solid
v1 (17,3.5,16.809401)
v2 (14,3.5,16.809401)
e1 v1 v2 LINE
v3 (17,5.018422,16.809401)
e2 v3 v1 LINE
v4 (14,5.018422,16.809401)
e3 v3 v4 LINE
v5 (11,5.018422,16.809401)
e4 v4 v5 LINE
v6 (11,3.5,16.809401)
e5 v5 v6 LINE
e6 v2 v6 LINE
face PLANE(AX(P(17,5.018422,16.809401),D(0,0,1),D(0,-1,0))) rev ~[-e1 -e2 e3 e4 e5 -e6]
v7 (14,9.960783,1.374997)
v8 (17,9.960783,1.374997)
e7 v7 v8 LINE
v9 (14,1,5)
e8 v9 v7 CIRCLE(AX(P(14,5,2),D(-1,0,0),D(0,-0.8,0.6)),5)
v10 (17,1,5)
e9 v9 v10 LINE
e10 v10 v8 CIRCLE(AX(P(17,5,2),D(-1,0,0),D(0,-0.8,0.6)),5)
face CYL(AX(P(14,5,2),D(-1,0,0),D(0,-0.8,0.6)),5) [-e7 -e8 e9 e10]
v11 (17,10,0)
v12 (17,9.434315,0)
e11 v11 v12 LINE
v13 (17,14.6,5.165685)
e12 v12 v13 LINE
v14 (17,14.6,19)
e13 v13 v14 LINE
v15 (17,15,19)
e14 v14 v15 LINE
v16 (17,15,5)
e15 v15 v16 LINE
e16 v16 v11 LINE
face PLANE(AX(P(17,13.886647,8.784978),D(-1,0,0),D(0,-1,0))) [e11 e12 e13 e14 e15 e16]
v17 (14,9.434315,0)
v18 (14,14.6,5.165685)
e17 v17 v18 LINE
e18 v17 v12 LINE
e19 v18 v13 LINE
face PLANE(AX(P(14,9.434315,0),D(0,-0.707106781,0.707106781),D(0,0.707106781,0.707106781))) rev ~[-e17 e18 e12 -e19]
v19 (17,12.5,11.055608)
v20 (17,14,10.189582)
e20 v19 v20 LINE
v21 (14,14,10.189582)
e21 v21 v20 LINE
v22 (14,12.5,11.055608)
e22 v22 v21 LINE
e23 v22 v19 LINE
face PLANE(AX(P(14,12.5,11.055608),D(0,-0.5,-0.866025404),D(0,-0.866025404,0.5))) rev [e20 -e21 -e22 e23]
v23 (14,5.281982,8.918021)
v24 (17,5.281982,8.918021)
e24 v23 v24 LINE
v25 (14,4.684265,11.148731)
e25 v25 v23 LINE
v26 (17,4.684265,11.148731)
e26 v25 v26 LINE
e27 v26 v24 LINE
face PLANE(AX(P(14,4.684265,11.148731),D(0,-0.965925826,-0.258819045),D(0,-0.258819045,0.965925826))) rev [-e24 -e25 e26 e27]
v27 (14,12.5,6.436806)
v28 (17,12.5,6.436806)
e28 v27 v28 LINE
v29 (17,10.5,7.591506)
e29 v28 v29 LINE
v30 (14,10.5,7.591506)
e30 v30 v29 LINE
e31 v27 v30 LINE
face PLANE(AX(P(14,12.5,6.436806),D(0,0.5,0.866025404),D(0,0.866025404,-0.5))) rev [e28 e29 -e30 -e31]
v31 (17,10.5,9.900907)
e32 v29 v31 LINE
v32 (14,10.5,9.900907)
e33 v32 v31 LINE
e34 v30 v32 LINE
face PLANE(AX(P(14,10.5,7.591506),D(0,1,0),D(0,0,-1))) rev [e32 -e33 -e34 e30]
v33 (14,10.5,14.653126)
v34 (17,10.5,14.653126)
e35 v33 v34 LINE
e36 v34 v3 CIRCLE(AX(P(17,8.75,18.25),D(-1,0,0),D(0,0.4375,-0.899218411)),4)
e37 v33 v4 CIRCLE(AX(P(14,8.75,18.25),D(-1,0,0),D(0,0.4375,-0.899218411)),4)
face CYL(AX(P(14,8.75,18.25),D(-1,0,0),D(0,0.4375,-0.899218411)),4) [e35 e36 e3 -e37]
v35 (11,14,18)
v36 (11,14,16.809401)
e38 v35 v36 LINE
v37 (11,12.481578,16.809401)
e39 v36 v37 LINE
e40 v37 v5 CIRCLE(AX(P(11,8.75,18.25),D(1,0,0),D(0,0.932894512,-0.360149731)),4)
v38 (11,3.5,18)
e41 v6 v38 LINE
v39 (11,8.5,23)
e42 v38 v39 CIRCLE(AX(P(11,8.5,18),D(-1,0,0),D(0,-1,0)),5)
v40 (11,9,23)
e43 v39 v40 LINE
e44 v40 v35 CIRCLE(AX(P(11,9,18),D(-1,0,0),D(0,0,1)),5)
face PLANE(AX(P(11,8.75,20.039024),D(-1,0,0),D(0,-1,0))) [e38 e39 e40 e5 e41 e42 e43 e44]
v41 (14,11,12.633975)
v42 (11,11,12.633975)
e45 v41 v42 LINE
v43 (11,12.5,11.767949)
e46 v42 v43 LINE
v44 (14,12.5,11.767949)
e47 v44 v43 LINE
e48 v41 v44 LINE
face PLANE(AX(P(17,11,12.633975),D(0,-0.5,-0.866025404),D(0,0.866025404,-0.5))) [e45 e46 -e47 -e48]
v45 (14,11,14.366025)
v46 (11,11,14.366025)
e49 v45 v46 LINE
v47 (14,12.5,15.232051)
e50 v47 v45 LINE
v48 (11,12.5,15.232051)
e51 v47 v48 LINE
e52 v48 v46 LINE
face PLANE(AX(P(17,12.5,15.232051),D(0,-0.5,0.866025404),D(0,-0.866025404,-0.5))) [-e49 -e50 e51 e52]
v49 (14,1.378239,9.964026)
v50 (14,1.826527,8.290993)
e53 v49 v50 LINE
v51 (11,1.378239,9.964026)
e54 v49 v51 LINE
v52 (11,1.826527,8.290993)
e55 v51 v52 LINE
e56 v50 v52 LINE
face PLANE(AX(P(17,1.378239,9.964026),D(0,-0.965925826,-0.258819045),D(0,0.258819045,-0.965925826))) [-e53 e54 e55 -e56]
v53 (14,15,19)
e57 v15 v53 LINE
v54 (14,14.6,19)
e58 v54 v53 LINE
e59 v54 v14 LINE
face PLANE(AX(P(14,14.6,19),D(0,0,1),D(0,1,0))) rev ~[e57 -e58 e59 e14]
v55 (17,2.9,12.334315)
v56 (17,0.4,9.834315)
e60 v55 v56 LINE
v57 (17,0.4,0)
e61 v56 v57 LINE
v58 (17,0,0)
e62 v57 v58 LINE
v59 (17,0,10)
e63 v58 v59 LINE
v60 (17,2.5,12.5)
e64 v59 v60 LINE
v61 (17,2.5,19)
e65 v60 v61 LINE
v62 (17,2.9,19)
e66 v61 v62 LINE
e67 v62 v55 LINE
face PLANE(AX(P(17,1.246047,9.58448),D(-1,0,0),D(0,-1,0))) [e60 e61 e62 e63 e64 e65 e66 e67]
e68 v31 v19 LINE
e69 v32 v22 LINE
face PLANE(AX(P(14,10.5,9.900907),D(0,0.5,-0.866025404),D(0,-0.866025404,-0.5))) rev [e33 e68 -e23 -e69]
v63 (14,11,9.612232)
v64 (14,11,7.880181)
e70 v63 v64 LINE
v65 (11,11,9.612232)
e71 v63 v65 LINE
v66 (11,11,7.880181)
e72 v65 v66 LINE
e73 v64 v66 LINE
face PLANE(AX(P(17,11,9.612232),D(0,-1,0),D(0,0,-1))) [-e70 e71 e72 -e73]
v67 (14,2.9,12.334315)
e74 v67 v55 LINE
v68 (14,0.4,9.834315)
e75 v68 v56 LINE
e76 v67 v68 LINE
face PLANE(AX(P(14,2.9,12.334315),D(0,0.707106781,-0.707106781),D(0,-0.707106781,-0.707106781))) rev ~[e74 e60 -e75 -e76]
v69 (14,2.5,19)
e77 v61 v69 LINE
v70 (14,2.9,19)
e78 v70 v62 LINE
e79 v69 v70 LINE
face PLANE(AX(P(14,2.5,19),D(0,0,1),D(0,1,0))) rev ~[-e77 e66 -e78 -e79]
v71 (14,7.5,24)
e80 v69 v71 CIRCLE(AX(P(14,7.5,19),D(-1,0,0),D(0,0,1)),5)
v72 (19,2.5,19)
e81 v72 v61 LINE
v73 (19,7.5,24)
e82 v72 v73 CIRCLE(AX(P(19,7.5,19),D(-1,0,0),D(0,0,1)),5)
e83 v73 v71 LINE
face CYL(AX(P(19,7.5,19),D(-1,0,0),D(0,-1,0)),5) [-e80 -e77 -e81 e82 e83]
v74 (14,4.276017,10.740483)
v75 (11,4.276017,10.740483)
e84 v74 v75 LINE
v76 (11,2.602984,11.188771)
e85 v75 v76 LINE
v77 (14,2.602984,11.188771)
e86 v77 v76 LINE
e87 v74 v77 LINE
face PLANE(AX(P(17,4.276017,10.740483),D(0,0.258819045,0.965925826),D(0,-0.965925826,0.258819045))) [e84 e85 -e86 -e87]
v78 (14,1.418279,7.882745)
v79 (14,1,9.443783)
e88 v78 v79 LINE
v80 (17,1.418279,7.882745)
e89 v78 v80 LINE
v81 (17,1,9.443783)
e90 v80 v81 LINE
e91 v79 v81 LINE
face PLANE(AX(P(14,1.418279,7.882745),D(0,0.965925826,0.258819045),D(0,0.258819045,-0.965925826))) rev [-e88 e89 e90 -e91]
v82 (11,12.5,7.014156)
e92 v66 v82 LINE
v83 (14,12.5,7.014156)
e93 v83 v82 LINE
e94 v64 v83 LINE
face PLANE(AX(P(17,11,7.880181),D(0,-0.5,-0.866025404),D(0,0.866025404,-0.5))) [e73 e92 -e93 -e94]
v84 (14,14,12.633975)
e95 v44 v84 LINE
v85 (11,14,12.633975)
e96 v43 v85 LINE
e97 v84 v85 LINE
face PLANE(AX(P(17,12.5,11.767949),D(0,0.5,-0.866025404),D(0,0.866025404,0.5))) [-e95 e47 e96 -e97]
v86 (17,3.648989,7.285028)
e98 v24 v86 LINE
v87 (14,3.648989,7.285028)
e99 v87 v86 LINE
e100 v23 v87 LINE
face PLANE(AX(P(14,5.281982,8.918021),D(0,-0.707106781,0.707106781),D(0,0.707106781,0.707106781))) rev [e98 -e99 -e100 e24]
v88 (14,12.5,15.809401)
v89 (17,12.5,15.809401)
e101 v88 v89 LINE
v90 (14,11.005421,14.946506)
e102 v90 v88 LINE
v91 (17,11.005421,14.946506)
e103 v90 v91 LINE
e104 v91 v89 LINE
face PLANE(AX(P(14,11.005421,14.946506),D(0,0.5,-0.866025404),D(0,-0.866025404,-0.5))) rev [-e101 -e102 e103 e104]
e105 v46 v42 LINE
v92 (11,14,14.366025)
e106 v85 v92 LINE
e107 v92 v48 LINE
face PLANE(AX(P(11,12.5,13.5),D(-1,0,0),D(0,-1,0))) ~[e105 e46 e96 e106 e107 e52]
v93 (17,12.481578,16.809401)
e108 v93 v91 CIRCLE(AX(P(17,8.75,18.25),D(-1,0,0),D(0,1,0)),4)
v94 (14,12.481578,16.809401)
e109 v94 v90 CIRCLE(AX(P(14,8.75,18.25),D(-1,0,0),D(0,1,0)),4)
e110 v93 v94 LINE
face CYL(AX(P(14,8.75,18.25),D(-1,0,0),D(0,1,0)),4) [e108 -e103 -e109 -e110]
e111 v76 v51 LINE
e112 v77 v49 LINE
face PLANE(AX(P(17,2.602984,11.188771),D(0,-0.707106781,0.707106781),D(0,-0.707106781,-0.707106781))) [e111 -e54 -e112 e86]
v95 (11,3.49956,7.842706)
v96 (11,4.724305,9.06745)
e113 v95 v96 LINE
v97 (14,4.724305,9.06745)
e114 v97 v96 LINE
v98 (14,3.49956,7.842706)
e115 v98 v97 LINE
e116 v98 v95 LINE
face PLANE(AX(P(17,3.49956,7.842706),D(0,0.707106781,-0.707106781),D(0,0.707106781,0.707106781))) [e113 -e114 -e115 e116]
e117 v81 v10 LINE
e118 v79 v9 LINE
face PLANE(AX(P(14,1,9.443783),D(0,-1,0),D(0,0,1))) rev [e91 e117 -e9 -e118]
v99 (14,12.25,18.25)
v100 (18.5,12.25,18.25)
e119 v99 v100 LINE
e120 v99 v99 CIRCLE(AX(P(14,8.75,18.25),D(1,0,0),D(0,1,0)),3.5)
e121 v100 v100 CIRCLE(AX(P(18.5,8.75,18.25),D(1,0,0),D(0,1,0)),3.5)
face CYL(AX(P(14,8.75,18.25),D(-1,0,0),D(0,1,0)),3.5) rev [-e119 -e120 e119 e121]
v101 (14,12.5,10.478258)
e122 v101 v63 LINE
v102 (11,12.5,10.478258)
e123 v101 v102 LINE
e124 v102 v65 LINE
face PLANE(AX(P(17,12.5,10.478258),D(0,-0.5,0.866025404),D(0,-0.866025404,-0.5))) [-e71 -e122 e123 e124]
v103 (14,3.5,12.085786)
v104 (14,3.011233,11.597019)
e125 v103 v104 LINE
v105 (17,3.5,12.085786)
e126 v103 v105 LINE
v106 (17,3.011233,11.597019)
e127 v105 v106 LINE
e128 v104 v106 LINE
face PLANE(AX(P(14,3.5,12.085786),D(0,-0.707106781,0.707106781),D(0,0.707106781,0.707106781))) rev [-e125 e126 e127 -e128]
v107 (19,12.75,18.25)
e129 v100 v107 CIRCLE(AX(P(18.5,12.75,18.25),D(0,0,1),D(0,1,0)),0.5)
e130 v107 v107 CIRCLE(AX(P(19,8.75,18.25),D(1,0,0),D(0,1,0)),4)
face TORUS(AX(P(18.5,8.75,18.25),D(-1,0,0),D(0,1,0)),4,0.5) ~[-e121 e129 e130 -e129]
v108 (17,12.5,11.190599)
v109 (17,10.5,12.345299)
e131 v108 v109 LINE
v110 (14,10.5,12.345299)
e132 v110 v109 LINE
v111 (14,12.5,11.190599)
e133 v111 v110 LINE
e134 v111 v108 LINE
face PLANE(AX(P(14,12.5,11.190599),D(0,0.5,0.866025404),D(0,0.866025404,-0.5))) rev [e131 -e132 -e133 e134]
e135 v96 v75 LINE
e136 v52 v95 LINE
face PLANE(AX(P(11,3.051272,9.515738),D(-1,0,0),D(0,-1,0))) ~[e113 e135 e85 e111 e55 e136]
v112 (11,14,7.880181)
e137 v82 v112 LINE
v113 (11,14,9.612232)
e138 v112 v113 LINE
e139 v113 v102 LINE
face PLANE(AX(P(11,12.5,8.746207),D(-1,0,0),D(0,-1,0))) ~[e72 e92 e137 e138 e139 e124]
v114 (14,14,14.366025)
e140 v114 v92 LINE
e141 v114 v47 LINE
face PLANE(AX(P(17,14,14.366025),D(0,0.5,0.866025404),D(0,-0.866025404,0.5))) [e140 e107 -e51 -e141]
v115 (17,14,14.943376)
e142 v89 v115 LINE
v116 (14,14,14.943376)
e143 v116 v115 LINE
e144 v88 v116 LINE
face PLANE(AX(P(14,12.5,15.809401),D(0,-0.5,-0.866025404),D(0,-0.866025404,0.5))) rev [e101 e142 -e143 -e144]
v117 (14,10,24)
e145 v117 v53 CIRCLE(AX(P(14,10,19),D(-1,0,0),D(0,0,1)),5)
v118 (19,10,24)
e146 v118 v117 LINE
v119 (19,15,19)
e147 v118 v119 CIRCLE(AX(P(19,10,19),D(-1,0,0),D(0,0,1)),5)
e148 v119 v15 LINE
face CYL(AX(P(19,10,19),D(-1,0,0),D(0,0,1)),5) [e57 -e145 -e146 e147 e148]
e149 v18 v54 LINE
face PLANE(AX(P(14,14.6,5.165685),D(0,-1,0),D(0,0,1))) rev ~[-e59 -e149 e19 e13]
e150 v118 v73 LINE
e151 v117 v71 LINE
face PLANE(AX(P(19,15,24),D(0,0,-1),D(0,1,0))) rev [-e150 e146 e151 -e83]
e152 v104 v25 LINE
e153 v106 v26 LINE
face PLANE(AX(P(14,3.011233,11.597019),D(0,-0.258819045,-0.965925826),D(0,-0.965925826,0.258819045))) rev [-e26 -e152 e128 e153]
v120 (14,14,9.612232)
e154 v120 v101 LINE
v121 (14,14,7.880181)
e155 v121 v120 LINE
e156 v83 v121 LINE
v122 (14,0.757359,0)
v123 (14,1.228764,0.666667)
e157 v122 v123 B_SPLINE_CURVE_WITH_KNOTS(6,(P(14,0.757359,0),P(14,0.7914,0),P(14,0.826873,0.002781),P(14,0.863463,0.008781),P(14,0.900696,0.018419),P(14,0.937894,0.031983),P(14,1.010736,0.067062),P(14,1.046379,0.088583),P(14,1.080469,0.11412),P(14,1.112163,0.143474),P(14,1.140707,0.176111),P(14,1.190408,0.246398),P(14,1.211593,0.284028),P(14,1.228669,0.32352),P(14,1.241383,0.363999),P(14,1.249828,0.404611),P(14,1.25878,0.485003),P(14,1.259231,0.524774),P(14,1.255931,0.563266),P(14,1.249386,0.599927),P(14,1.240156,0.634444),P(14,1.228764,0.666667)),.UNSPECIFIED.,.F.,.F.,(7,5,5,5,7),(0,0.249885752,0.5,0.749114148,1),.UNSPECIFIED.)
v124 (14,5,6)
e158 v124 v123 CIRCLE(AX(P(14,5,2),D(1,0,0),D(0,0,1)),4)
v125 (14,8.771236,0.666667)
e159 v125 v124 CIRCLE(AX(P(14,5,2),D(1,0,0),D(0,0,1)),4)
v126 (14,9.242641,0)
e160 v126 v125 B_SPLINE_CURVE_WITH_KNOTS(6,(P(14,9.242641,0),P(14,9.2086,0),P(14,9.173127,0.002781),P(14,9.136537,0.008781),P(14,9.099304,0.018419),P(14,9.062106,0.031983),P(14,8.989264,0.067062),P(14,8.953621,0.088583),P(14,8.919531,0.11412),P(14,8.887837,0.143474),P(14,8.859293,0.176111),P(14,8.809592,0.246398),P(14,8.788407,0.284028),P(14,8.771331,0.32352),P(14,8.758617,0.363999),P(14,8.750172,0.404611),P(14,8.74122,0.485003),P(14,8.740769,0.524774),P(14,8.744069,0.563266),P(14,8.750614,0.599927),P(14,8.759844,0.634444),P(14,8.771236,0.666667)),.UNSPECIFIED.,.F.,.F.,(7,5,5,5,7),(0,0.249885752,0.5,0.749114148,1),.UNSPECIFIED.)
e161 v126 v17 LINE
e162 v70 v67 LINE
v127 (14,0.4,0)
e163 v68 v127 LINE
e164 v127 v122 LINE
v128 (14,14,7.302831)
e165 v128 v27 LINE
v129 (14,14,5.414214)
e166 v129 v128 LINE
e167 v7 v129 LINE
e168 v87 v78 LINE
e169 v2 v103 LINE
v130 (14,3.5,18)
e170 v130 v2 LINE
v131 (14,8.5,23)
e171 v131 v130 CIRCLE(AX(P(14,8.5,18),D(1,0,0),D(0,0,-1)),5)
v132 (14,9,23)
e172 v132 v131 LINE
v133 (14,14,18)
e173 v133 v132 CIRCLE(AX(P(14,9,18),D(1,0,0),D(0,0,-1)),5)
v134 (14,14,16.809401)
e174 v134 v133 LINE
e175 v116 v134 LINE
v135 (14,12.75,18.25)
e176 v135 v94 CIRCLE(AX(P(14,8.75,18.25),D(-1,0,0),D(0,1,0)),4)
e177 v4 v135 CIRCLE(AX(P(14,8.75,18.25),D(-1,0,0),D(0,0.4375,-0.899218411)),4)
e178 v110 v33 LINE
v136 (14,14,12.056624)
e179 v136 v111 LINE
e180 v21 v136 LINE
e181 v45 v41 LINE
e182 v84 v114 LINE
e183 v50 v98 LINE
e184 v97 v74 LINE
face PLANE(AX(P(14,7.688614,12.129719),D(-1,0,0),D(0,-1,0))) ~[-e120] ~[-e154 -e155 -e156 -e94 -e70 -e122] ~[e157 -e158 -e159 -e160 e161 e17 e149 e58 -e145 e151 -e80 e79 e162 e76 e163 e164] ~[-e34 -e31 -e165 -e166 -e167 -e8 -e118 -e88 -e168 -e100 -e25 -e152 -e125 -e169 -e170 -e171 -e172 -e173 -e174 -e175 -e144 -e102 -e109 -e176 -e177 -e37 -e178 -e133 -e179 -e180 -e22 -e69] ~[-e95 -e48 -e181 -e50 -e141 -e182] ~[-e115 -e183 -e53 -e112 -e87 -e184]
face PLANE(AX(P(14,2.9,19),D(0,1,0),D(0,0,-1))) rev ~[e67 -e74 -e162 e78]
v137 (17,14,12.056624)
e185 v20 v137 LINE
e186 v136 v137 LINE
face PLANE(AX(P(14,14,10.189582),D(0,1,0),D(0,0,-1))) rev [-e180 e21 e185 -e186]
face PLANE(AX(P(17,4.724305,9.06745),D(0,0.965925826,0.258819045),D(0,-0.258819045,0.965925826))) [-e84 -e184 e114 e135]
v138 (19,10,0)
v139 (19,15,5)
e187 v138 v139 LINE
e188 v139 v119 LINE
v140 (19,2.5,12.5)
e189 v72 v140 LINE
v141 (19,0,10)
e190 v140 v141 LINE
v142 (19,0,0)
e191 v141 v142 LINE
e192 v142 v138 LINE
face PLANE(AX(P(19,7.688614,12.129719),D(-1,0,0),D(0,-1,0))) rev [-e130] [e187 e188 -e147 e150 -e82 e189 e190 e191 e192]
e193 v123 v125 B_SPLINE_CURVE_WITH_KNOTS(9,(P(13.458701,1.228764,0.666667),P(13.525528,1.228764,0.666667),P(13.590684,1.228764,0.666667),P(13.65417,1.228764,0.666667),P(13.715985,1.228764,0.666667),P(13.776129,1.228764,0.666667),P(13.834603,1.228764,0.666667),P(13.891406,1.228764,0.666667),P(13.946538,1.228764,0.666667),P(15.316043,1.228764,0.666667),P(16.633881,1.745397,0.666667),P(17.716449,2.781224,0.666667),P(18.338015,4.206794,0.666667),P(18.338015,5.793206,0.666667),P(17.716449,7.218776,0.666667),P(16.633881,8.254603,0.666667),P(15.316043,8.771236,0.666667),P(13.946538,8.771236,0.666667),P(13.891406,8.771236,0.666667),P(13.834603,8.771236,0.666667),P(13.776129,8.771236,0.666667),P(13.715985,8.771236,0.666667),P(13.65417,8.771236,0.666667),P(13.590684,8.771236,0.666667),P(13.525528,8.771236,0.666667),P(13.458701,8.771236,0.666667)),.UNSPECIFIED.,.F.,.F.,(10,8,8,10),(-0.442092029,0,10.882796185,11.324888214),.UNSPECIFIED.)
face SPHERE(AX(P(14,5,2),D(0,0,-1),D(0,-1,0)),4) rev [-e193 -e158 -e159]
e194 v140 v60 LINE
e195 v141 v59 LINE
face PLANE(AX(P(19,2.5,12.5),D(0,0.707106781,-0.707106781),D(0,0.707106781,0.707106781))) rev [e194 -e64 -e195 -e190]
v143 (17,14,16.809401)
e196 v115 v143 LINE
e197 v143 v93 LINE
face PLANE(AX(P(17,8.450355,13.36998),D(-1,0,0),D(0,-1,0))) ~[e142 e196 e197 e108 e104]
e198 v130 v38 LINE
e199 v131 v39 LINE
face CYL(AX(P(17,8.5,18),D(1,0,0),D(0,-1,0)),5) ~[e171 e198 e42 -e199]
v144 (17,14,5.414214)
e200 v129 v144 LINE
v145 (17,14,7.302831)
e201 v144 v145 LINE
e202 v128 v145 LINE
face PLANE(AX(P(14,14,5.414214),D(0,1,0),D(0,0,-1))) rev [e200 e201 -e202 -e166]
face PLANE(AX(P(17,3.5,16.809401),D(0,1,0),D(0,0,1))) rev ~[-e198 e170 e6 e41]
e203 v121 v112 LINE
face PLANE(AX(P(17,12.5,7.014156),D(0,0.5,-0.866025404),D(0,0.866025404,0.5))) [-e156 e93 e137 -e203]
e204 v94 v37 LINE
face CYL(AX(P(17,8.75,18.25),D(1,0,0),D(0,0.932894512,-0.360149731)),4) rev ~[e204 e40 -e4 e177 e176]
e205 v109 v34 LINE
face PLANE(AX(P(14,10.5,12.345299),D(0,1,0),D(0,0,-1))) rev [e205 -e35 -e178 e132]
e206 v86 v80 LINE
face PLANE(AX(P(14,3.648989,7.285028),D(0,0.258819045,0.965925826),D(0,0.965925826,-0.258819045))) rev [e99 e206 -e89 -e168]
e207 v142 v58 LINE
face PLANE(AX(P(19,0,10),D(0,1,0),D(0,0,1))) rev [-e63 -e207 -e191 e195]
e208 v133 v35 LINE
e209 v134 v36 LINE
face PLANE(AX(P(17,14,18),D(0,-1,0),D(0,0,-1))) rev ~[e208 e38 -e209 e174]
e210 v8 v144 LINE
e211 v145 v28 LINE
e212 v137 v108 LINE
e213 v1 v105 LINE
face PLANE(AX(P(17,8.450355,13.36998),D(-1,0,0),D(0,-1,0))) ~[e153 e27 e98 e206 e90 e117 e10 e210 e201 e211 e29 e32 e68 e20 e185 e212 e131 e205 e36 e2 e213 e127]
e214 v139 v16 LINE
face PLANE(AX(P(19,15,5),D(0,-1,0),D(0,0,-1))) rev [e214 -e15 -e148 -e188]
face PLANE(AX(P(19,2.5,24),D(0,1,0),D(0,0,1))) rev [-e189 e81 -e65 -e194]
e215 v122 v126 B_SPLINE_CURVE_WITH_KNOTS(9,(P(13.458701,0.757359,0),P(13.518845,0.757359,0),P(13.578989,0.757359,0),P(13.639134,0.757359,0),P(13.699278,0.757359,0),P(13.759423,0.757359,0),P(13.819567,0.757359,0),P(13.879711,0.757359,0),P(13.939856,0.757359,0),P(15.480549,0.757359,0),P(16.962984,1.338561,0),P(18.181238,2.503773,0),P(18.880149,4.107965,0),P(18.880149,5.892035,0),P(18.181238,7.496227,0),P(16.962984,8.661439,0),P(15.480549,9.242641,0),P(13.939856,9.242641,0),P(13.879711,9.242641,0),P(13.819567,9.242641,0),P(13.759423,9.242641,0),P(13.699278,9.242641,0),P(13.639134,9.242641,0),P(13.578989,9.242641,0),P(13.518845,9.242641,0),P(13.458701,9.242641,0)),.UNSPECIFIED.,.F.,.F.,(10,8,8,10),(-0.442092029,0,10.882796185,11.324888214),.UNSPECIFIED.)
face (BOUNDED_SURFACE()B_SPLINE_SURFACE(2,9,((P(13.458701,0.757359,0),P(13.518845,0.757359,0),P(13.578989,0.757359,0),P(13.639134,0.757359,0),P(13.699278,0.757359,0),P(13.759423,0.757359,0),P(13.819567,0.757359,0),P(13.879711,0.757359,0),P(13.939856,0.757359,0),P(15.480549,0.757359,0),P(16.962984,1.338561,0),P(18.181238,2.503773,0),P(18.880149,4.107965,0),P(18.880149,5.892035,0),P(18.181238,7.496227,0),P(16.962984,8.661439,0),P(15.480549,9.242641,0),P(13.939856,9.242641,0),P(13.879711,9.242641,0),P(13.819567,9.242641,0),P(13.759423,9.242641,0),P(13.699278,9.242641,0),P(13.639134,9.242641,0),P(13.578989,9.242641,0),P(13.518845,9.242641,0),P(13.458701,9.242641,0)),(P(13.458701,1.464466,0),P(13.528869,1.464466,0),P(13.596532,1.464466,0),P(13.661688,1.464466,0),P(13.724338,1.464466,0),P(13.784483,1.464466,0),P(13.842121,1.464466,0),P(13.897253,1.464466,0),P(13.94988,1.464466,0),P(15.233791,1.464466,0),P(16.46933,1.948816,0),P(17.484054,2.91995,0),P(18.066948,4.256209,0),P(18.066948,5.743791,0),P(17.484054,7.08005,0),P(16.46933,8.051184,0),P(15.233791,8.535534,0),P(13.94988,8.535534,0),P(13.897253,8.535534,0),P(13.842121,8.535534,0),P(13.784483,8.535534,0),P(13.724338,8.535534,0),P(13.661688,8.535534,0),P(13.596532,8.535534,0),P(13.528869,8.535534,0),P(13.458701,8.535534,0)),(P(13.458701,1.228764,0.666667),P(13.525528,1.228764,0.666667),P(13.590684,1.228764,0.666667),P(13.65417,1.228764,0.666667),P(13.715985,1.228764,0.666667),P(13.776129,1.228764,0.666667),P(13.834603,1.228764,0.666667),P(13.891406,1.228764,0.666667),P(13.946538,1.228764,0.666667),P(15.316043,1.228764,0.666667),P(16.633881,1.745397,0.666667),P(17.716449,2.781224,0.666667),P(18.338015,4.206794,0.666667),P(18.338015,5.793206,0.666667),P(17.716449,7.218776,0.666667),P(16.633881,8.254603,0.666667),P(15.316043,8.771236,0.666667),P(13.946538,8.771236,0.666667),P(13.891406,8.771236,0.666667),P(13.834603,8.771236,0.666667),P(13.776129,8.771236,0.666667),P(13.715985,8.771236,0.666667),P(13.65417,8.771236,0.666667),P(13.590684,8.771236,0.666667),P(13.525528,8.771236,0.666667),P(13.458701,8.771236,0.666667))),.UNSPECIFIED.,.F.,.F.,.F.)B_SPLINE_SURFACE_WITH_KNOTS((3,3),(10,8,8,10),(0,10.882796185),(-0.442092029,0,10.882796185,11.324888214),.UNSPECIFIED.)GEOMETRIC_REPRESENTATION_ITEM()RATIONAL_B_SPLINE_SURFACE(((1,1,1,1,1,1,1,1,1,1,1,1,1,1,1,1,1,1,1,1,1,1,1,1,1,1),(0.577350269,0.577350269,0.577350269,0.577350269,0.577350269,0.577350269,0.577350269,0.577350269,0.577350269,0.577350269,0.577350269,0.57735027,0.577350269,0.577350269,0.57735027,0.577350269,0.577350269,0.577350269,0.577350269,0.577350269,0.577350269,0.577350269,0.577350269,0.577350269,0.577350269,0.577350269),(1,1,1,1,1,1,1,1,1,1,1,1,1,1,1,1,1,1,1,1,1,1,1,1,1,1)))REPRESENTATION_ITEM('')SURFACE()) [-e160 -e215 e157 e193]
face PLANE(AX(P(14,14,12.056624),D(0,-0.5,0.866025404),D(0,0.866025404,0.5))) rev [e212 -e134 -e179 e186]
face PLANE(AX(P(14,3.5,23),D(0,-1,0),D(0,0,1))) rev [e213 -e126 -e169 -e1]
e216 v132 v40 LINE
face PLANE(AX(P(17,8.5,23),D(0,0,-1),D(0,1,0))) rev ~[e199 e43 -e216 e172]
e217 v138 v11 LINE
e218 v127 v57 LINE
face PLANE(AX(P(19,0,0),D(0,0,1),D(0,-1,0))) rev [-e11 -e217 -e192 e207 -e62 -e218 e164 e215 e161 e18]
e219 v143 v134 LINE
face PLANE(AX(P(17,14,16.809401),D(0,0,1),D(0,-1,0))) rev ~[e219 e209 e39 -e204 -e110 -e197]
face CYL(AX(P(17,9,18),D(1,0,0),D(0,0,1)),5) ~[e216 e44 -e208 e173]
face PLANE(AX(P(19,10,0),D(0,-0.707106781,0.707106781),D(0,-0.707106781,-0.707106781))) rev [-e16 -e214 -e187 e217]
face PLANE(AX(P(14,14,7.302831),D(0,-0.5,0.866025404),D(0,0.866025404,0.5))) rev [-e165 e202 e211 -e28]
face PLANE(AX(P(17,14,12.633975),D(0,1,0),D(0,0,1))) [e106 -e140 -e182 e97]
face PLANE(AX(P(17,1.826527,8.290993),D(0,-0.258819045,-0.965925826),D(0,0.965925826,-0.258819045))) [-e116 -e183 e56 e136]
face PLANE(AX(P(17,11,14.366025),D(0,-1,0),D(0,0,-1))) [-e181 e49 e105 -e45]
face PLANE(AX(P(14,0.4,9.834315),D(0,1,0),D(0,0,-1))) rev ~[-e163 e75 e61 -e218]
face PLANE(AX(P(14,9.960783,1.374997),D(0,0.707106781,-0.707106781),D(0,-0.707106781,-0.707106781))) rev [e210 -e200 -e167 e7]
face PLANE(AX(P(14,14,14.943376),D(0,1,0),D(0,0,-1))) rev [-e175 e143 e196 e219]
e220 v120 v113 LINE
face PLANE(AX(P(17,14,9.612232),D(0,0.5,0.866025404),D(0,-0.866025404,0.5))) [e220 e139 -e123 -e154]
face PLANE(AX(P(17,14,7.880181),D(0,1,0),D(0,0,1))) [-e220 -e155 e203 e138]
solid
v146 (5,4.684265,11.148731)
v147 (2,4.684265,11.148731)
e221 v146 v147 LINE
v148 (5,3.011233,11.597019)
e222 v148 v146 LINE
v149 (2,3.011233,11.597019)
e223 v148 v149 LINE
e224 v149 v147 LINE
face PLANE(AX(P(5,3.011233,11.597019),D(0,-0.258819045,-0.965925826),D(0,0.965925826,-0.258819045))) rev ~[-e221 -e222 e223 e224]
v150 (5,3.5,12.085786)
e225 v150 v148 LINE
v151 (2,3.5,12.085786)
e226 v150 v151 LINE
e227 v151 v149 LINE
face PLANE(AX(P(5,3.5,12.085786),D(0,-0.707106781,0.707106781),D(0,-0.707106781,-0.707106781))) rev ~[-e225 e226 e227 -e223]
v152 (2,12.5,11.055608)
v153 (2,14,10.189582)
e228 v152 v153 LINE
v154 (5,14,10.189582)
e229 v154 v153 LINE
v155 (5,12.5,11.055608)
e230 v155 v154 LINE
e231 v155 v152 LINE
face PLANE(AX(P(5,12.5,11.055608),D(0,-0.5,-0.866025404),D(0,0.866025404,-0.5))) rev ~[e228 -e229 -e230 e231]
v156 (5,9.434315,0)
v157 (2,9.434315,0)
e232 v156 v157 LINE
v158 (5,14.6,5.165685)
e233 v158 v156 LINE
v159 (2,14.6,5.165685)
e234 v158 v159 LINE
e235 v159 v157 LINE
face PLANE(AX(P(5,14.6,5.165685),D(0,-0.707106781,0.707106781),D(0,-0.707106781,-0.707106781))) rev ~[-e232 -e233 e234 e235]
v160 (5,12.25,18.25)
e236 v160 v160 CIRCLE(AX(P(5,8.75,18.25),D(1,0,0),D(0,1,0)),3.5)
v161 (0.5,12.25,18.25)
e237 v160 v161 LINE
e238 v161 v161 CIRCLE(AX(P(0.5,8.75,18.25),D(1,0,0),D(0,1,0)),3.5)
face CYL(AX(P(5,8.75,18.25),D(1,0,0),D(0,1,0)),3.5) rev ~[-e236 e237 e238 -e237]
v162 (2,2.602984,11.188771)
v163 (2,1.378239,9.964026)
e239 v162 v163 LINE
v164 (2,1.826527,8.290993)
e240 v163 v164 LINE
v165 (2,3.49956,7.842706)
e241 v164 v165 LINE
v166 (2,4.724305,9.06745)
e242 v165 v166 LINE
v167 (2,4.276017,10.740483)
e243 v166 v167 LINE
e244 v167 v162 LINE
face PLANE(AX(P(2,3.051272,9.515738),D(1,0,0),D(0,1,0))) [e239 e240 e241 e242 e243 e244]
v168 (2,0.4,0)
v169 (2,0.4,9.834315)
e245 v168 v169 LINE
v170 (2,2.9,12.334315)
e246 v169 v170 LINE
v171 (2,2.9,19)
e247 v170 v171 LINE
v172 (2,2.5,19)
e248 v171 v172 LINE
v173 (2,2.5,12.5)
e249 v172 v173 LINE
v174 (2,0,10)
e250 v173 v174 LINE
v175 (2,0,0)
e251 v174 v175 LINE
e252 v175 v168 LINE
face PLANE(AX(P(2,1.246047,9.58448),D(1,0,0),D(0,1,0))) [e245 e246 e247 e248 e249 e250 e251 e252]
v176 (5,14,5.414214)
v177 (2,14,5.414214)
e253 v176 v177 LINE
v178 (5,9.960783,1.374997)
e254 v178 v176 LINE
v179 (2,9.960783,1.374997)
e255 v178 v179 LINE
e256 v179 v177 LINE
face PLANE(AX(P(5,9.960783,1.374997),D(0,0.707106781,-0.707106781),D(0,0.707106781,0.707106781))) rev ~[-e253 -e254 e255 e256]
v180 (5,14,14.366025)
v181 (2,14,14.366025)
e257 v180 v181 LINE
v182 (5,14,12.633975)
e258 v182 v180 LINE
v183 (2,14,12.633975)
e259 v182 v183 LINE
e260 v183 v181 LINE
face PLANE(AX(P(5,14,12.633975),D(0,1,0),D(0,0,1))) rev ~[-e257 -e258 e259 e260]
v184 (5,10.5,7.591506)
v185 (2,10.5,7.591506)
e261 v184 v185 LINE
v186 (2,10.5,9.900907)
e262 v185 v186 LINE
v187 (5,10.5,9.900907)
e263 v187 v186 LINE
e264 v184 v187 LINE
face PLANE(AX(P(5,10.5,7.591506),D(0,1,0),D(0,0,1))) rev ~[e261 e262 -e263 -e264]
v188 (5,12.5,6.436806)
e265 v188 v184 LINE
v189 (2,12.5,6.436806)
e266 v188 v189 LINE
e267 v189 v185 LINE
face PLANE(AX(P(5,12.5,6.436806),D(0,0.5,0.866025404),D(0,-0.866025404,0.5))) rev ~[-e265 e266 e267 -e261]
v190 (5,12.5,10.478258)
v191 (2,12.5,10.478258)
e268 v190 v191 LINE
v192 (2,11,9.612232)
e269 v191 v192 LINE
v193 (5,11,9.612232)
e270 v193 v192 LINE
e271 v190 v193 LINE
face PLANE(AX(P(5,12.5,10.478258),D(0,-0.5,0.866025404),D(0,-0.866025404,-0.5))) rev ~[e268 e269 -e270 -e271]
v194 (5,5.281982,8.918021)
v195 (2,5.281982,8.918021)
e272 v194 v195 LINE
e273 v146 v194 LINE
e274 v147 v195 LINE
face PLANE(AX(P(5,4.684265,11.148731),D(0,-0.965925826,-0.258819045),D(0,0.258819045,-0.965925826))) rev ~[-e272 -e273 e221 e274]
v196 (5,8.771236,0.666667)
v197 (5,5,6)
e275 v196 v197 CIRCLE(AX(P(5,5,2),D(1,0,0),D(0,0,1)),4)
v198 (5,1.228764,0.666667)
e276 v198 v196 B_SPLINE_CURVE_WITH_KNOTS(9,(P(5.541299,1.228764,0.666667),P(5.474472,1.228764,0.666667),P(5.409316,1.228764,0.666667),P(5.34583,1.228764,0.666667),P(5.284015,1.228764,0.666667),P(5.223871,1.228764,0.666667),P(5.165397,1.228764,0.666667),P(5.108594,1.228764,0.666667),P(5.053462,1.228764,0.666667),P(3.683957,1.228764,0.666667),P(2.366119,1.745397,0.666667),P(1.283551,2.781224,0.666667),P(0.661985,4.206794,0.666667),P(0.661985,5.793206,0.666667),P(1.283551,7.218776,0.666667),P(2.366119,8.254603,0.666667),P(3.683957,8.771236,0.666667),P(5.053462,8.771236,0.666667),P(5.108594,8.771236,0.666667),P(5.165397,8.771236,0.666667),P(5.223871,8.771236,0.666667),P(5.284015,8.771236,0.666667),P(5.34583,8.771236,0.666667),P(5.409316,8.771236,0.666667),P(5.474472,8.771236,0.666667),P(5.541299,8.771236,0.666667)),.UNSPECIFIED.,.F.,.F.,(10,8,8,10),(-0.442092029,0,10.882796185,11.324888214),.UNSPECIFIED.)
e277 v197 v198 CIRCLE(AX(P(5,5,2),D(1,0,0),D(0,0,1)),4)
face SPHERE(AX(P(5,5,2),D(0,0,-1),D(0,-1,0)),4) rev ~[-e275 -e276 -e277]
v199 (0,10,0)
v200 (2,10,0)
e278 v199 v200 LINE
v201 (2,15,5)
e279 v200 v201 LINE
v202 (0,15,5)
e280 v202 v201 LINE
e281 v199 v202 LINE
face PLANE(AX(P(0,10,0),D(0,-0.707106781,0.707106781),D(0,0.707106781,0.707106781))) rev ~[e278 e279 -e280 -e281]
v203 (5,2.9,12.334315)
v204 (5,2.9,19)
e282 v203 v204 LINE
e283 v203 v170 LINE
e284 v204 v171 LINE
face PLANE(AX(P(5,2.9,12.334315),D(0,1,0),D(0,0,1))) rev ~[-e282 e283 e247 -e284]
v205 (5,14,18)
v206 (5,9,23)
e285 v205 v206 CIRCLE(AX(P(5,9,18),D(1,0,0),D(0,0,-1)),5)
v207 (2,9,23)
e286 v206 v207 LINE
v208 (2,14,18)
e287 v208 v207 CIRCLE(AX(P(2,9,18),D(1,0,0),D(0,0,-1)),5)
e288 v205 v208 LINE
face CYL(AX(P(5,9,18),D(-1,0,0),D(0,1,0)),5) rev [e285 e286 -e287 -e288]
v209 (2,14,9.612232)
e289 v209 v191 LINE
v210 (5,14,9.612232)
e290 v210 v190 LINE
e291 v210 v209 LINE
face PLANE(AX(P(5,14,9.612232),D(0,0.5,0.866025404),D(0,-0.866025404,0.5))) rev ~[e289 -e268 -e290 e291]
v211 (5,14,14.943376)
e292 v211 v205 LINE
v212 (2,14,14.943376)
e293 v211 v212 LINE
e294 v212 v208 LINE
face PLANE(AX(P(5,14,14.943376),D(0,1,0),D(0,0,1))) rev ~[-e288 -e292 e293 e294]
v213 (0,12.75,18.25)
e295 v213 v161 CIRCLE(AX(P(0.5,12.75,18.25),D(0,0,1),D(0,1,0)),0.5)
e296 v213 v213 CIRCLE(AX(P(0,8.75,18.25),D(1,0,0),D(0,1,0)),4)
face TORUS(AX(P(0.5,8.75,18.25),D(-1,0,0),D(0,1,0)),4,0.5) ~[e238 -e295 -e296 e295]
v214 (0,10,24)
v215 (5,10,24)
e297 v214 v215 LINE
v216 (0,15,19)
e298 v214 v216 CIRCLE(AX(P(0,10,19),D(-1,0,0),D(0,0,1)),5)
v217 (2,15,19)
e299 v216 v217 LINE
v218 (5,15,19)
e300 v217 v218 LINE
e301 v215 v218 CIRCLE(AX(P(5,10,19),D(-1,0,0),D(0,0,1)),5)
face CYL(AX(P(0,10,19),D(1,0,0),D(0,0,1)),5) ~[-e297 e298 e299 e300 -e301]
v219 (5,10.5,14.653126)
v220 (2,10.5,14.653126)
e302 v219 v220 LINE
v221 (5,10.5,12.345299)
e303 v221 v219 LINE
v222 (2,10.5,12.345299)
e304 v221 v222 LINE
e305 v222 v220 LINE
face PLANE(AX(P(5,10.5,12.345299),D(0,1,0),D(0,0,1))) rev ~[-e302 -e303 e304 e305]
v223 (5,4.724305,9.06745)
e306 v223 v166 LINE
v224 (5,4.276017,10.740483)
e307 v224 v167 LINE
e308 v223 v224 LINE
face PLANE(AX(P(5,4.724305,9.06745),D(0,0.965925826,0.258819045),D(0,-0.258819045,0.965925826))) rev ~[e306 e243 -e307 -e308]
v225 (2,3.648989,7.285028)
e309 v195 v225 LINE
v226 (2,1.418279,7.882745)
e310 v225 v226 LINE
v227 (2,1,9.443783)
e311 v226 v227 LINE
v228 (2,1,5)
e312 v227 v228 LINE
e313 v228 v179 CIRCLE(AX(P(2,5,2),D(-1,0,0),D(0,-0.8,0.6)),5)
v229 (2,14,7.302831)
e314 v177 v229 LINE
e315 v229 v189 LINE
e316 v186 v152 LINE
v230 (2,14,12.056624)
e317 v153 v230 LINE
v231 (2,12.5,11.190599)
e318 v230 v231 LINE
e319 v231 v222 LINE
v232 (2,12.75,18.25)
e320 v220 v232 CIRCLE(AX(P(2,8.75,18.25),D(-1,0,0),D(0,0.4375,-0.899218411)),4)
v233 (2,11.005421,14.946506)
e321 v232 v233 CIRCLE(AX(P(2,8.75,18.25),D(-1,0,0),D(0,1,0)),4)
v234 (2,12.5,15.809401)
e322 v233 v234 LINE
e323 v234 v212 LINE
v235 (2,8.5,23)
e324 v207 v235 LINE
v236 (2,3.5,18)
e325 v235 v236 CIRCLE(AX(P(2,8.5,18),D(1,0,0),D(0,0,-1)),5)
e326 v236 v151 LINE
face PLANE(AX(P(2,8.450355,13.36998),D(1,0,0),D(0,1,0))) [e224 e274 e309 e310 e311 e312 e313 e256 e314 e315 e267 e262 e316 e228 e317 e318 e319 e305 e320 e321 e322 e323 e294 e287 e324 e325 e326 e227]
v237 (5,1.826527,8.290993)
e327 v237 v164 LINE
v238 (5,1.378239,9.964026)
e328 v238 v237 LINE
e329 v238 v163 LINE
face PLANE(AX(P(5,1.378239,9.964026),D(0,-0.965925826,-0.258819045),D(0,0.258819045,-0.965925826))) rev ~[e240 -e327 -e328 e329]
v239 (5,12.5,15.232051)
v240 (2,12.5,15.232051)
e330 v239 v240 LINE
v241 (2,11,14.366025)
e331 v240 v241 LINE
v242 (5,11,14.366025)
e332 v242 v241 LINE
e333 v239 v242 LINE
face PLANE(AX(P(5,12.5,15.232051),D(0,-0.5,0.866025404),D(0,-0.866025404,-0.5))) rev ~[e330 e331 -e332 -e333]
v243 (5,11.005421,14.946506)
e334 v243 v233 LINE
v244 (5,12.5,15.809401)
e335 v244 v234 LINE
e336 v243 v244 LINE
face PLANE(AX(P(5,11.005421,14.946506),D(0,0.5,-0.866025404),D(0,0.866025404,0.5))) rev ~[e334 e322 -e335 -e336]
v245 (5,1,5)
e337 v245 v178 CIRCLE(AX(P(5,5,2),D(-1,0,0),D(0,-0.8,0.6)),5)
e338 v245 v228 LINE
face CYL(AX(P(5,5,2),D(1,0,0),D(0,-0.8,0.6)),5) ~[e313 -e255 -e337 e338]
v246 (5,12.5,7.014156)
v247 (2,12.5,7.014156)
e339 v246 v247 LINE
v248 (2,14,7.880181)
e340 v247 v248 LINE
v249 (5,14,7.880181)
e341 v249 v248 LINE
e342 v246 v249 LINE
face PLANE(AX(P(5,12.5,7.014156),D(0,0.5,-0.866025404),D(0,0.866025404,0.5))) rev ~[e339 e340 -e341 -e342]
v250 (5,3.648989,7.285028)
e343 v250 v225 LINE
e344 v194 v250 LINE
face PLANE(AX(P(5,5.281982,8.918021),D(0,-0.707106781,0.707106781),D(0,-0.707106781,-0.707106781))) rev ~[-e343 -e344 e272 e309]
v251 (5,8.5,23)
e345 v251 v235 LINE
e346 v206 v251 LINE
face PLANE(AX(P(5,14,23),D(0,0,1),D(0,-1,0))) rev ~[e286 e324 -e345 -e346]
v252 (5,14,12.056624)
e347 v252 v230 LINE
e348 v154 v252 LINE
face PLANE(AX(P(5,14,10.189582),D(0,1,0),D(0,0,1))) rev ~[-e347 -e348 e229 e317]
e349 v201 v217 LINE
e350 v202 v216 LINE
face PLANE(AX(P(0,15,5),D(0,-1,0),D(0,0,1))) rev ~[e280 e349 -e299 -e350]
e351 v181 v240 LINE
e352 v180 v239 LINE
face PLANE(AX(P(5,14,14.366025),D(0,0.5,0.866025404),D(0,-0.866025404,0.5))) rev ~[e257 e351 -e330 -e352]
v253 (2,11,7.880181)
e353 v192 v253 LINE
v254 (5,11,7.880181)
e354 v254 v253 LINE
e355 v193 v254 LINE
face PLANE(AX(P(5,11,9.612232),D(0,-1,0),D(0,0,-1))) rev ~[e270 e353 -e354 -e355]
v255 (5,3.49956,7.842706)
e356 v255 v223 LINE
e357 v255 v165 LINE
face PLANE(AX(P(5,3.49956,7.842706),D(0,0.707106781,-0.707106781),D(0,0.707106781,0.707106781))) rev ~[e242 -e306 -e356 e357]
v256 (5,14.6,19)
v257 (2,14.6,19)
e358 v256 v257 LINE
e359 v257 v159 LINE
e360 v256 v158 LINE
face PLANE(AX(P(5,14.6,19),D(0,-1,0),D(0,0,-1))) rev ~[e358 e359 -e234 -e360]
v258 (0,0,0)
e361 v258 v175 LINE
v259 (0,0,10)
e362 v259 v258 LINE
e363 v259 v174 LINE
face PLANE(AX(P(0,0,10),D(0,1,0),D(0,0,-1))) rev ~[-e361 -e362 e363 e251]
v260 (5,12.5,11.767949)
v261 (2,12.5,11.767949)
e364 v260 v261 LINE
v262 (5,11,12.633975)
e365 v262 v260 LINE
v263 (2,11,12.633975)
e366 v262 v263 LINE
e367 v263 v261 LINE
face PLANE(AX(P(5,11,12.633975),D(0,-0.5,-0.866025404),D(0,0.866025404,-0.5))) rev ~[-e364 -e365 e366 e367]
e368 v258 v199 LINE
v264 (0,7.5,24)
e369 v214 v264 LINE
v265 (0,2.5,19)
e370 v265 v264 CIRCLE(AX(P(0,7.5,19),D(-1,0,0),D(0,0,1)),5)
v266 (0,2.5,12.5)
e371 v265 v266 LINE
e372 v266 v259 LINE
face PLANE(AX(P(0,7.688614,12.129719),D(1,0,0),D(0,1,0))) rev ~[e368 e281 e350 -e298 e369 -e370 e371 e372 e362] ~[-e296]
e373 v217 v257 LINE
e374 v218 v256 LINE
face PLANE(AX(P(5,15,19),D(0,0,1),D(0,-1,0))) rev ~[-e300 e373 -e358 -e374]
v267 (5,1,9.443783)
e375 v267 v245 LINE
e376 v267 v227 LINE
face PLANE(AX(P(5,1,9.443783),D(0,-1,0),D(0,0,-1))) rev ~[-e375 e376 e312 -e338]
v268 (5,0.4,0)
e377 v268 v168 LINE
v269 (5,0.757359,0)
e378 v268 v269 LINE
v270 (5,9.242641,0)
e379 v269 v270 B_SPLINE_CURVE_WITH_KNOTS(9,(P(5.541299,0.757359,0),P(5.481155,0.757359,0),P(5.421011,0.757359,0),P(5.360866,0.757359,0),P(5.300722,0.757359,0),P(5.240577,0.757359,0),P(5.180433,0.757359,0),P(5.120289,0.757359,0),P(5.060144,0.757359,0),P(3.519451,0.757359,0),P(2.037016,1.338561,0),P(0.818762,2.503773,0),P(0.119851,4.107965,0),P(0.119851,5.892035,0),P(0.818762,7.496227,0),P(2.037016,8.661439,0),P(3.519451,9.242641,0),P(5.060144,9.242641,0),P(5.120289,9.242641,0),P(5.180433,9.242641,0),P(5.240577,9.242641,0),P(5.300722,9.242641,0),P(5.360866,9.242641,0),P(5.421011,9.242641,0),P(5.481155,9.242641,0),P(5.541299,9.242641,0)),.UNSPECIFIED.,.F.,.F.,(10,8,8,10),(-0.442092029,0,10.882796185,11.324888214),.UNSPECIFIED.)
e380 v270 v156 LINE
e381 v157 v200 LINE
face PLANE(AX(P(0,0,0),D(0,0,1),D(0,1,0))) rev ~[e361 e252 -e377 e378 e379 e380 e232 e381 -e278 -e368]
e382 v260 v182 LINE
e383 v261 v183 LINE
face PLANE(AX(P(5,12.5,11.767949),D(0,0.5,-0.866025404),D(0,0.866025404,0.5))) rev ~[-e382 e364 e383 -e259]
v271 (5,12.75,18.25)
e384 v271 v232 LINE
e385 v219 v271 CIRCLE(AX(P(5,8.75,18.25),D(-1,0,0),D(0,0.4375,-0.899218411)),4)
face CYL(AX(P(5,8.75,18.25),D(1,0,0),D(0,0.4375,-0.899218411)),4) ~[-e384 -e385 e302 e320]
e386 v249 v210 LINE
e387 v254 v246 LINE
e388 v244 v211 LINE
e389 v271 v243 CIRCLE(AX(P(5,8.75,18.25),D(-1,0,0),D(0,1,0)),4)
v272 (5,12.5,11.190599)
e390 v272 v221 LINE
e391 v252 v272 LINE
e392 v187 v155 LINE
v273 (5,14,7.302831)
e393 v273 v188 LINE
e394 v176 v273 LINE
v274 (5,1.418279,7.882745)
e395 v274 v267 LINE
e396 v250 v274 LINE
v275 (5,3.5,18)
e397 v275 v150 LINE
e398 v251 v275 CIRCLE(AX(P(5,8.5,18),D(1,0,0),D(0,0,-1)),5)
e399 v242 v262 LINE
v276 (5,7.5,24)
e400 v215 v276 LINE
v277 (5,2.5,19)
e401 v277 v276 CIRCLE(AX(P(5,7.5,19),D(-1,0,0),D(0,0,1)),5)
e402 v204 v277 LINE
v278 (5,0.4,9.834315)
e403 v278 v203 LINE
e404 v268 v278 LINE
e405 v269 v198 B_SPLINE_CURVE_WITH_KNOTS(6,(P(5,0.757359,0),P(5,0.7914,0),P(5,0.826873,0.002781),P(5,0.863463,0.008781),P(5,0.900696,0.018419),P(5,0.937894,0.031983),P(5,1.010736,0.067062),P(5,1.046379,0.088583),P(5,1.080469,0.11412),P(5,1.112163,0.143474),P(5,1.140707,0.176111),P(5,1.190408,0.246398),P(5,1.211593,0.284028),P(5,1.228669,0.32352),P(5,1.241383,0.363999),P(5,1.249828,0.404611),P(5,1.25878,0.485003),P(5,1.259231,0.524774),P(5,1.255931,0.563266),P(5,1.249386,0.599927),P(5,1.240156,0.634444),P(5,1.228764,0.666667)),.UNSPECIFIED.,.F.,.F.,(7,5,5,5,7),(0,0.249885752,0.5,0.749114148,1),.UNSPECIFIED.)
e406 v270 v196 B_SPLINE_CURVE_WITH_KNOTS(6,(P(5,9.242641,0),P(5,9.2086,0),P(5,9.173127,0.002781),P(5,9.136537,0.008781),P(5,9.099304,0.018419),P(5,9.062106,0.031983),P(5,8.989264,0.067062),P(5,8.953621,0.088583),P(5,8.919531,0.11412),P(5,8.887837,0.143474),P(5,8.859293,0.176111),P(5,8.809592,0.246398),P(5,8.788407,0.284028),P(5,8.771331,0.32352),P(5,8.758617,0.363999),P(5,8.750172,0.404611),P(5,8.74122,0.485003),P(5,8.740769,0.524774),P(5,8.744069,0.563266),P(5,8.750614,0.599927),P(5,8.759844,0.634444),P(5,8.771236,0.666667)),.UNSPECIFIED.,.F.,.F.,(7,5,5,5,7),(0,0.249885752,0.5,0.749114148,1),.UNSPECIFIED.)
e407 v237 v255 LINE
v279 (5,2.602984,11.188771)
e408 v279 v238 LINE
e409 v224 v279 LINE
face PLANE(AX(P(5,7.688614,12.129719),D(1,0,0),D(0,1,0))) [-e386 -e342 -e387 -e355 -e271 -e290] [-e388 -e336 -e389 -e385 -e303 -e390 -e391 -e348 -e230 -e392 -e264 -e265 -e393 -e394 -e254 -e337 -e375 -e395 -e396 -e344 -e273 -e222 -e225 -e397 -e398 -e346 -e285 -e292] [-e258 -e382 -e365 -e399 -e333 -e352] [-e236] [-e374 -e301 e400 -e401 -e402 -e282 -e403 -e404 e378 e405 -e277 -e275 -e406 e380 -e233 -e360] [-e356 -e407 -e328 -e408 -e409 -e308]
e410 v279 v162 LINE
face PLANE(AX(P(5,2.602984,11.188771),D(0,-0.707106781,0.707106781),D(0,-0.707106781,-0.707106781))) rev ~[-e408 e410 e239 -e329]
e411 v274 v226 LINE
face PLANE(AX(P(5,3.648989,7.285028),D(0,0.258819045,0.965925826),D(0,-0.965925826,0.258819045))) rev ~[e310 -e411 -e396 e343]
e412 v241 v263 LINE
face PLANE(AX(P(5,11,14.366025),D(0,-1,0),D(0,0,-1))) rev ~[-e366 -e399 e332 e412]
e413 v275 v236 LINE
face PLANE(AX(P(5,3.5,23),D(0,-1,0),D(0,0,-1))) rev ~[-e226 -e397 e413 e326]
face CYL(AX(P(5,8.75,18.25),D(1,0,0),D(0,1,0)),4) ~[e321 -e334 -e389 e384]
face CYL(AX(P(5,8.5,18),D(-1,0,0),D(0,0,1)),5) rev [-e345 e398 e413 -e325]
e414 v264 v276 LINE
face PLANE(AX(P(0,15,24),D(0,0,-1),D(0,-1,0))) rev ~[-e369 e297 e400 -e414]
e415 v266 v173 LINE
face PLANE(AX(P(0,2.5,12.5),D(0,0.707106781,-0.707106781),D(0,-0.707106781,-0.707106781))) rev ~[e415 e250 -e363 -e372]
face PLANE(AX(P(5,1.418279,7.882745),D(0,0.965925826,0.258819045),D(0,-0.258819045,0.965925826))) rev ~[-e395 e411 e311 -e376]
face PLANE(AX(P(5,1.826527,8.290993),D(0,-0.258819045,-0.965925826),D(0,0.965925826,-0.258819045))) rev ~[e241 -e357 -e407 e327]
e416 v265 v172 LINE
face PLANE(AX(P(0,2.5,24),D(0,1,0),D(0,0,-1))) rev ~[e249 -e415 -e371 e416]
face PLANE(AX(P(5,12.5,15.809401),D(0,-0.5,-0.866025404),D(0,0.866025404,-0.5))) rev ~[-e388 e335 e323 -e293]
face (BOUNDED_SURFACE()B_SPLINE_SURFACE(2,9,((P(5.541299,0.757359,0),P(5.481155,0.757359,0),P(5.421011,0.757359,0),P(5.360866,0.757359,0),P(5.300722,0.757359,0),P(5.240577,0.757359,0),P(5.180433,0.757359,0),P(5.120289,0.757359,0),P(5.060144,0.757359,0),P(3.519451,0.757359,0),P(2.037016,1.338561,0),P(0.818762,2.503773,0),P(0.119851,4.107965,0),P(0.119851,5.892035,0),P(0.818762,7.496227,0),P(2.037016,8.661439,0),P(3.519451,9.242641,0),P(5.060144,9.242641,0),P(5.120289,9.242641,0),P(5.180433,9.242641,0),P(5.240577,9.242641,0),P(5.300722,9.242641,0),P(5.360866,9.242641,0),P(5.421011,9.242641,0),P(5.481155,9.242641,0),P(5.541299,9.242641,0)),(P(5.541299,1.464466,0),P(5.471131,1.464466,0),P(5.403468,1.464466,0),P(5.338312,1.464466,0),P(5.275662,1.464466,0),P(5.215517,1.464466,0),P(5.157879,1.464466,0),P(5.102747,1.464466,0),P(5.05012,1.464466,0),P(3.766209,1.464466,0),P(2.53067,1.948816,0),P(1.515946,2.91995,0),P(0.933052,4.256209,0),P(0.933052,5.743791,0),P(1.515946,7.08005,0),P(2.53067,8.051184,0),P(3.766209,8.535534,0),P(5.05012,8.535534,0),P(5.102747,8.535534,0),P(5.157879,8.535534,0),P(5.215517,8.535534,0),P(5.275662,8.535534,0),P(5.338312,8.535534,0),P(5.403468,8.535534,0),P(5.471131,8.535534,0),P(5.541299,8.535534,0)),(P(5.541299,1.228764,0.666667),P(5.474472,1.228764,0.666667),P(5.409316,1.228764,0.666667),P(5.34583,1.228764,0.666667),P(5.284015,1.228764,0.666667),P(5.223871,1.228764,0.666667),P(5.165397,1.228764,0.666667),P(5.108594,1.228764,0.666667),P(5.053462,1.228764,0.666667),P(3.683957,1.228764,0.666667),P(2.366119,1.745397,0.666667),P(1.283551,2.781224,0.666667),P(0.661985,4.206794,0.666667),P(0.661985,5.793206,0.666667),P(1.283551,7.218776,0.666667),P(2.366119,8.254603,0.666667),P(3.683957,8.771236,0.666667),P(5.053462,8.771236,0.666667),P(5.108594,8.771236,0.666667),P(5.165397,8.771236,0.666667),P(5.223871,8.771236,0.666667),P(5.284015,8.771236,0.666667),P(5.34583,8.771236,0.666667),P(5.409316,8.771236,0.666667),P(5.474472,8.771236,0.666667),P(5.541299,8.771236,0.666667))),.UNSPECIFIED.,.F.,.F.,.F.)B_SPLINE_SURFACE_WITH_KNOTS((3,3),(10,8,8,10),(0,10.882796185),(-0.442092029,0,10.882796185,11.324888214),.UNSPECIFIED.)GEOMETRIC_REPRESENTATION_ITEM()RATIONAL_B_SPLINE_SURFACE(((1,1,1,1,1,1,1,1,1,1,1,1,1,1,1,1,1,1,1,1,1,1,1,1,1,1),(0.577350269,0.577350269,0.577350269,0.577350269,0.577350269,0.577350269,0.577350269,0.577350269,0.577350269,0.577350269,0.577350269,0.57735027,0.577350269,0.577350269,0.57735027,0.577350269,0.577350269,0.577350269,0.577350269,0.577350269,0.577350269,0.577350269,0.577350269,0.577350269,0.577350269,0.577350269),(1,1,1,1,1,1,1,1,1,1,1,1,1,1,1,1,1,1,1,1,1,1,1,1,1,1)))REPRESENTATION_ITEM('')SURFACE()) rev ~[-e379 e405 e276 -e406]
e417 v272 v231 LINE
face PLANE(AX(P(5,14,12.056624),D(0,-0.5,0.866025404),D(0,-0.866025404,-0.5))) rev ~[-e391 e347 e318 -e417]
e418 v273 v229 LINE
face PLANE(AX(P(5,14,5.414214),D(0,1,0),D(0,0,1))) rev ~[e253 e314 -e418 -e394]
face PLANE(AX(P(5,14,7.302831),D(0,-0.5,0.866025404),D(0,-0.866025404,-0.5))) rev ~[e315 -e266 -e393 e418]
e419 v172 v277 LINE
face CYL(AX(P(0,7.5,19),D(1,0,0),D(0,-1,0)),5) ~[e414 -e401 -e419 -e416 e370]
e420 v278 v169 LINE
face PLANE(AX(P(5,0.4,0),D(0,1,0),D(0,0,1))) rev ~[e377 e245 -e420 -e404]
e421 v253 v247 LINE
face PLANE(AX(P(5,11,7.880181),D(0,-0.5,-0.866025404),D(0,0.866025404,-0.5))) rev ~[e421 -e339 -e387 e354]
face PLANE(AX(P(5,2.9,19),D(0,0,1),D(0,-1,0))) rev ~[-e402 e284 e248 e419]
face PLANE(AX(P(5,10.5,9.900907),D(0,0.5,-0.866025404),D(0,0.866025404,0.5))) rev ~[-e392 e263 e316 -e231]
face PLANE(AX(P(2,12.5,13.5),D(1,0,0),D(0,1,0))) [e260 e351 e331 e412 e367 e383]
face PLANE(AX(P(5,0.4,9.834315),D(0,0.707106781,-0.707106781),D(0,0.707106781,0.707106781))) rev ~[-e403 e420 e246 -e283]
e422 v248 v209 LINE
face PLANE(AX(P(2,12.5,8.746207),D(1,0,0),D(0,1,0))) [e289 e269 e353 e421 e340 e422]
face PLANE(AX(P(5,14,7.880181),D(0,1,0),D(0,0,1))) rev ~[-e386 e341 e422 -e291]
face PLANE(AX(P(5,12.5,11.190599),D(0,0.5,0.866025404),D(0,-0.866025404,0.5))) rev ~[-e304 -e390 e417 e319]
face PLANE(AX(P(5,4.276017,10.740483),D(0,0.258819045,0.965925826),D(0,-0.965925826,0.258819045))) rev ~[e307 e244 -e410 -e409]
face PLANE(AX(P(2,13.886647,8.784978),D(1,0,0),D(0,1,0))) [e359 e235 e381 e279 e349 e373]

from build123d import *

# Parameters (mm, degrees)
F1_DEPTH  = 5
F4_R      = 3.5
F5_DEPTH  = 25
F7_DEPTH  = 3
F9_R      = 5
F11_DEPTH = 6
F13_DEPTH = 6
F14_R     = 0.5
F14_2_R   = 0.5
F16_DEPTH = 3
F18_DEPTH = 3


with BuildPart() as f1:
    # F0 (on Right) → F1 (new body)
    with BuildSketch(Plane.YZ):
        Polygon((0, 10), (0, 0), (10, 0), (15, 5), (15, 20), (15, 24), (2.5, 24), (2.5, 20), (2.5, 12.5), align=None)
    extrude(amount=F1_DEPTH)

    # F2 (on face) → F3 (revolve, cut)
    with BuildSketch(Plane.YZ.offset(5)):
        with BuildLine():
            Line((5, -2), (5, 6))
            ThreePointArc((5, 6), (1, 2), (5, -2))
        make_face()
    revolve(axis=Axis((5, 5, 2), (0, 0, -1)), mode=Mode.SUBTRACT)

    # F4 (on face) → F5 (cut)
    with BuildSketch(Plane.YZ.offset(5)):
        with Locations((8.75, 18.25)):
            Circle(F4_R)
    extrude(amount=-F5_DEPTH, mode=Mode.SUBTRACT)

    # F6 (on face) → F7 (cut)
    with BuildSketch(Plane.YZ.offset(5)):
        with BuildLine():
            Line((1.4182789124, 7.8827450064), (1, 9.4437831591))
            Line((1, 9.4437831591), (1, 5))
            ThreePointArc((1, 5), (6.8750834794, 6.6350902845), (9.9607833148, 1.3749968772))
            Line((9.9607833148, 1.3749968772), (14, 5.4142135624))
            Line((14, 5.4142135624), (14, 7.3028310874))
            Line((14, 7.3028310874), (12.5, 6.4368056836))
            Line((12.5, 6.4368056836), (10.5, 7.591506222))
            Line((10.5, 7.591506222), (10.5, 9.9009072988))
            Line((10.5, 9.9009072988), (12.5, 11.0556078372))
            Line((12.5, 11.0556078372), (14, 10.1895824334))
            Line((14, 10.1895824334), (14, 12.056624327))
            Line((14, 12.056624327), (12.5, 11.1905989232))
            Line((12.5, 11.1905989232), (10.5, 12.3452994616))
            Line((10.5, 12.3452994616), (10.5, 14.6531263575))
            ThreePointArc((10.5, 14.6531263575), (5.3588350084, 20.3713203436), (12.75, 18.25))
            ThreePointArc((12.75, 18.25), (12.2870669156, 16.3820712982), (11.0054211826, 14.9465055942))
            Line((11.0054211826, 14.9465055942), (12.5, 15.8094010768))
            Line((12.5, 15.8094010768), (14, 14.943375673))
            Line((14, 14.943375673), (14, 23))
            Line((14, 23), (3.5, 23))
            Line((3.5, 23), (3.5, 12.0857864376))
            Line((3.5, 12.0857864376), (3.0112326286, 11.5970190662))
            Line((3.0112326286, 11.5970190662), (4.6842652361, 11.1487313301))
            Line((4.6842652361, 11.1487313301), (5.2819822175, 8.9180211868))
            Line((5.2819822175, 8.9180211868), (3.6489890557, 7.285028025))
            Line((3.6489890557, 7.285028025), (1.4182789124, 7.8827450064))
        make_face()
        Polygon((2.6029843381, 11.1887707758), (1.3782394667, 9.9640259044), (1.8265272028, 8.2909932969), (3.4995598103, 7.8427055608), (4.7243046817, 9.0674504322), (4.2760169456, 10.7404830397), align=None)
        Polygon((12.5, 7.0141559528), (14, 7.8801813566), (14, 9.6122321642), (12.5, 10.478257568), (11, 9.6122321642), (11, 7.8801813566), align=None)
        Polygon((14, 12.6339745962), (14, 14.3660254038), (12.5, 15.2320508076), (11, 14.3660254038), (11, 12.6339745962), (12.5, 11.7679491924), align=None)
    extrude(amount=-F7_DEPTH, mode=Mode.SUBTRACT)

    # F9
    f9_edges = [f1.edges().sort_by_distance(p)[0] for p in [
        (2.5, 2.5, 24),
        (2.5, 15, 24),
        (3.5, 3.5, 23),
        (3.5, 14, 23),
    ]]
    fillet(f9_edges, radius=F9_R)


with BuildPart() as f10_1:
    # F10: instance of F1
    add(f1.part.mirror(Plane.YZ.offset(9.5)))

    # F11 (add): faces of the model
    f11_faces = [f10_1.faces().sort_by_distance(p)[0] for p in [
        (17, 12.5, 8.7462067604),
        (17, 12.5, 13.5),
        (17, 3.0512720742, 9.5157381683),
    ]]
    extrude(f11_faces, amount=F11_DEPTH)

    # F12 (on face) → F13 (join)
    with BuildSketch(Plane(origin=(17, 0, 0), x_dir=(0, -1, 0), z_dir=(-1, 0, 0))):
        with BuildLine():
            Line((-14, 18), (-14, 16.8094010768))
            Line((-14, 16.8094010768), (-12.4815780499, 16.8094010768))
            ThreePointArc((-12.4815780499, 16.8094010768), (-8.75, 22.25), (-5.0184219501, 16.8094010768))
            Line((-5.0184219501, 16.8094010768), (-3.5, 16.8094010768))
            Line((-3.5, 16.8094010768), (-3.5, 18))
            ThreePointArc((-3.5, 18), (-4.9644660941, 21.5355339059), (-8.5, 23))
            Line((-8.5, 23), (-9, 23))
            ThreePointArc((-9, 23), (-12.5355339059, 21.5355339059), (-14, 18))
        make_face()
    extrude(amount=F13_DEPTH)

    # F14#2
    f14_2_edges = [f10_1.edges().sort_by_distance(p)[0] for p in [
        (19, 5.25, 18.25),
        (17.464102, 5, 0),
    ]]
    fillet(f14_2_edges, radius=F14_2_R)

    # F17 (on face) → F18 (cut)
    with BuildSketch(Plane(origin=(14, 0, 0), x_dir=(0, -1, 0), z_dir=(-1, 0, 0))):
        Polygon((-14.6, 19), (-15, 19), (-15, 5), (-10, 0), (-9.4343145751, 0), (-14.6, 5.1656854249), align=None)
        Polygon((-0.4, 0), (0, 0), (0, 10), (-2.5, 12.5), (-2.5, 19), (-2.9, 19), (-2.9, 12.3343145751), (-0.4, 9.8343145751), align=None)
    extrude(amount=-F18_DEPTH, mode=Mode.SUBTRACT)


with BuildPart() as f1_1:
    add(f1.part)

    # F14
    f14_edges = [f1_1.edges().sort_by_distance(p)[0] for p in [
        (0, 5.25, 18.25),
        (1.535898, 5, 0),
    ]]
    fillet(f14_edges, radius=F14_R)

    # F15 (on face) → F16 (cut)
    with BuildSketch(Plane.YZ.offset(5)):
        Polygon((0, 10), (0, 0), (0.4, 0), (0.4, 9.8343145751), (2.8896803781, 12.3239949532), (2.9, 12.3343145751), (2.9, 12.8194838762), (2.9, 19), (2.5, 19), (2.5, 12.5), align=None)
        Polygon((15, 5), (15, 19), (14.6, 19), (14.6, 5.1656854249), (14.5191117842, 5.0847972091), (9.4343145751, 0), (10, 0), align=None)
    extrude(amount=-F16_DEPTH, mode=Mode.SUBTRACT)


solid = Compound([f10_1.part, f1_1.part])
